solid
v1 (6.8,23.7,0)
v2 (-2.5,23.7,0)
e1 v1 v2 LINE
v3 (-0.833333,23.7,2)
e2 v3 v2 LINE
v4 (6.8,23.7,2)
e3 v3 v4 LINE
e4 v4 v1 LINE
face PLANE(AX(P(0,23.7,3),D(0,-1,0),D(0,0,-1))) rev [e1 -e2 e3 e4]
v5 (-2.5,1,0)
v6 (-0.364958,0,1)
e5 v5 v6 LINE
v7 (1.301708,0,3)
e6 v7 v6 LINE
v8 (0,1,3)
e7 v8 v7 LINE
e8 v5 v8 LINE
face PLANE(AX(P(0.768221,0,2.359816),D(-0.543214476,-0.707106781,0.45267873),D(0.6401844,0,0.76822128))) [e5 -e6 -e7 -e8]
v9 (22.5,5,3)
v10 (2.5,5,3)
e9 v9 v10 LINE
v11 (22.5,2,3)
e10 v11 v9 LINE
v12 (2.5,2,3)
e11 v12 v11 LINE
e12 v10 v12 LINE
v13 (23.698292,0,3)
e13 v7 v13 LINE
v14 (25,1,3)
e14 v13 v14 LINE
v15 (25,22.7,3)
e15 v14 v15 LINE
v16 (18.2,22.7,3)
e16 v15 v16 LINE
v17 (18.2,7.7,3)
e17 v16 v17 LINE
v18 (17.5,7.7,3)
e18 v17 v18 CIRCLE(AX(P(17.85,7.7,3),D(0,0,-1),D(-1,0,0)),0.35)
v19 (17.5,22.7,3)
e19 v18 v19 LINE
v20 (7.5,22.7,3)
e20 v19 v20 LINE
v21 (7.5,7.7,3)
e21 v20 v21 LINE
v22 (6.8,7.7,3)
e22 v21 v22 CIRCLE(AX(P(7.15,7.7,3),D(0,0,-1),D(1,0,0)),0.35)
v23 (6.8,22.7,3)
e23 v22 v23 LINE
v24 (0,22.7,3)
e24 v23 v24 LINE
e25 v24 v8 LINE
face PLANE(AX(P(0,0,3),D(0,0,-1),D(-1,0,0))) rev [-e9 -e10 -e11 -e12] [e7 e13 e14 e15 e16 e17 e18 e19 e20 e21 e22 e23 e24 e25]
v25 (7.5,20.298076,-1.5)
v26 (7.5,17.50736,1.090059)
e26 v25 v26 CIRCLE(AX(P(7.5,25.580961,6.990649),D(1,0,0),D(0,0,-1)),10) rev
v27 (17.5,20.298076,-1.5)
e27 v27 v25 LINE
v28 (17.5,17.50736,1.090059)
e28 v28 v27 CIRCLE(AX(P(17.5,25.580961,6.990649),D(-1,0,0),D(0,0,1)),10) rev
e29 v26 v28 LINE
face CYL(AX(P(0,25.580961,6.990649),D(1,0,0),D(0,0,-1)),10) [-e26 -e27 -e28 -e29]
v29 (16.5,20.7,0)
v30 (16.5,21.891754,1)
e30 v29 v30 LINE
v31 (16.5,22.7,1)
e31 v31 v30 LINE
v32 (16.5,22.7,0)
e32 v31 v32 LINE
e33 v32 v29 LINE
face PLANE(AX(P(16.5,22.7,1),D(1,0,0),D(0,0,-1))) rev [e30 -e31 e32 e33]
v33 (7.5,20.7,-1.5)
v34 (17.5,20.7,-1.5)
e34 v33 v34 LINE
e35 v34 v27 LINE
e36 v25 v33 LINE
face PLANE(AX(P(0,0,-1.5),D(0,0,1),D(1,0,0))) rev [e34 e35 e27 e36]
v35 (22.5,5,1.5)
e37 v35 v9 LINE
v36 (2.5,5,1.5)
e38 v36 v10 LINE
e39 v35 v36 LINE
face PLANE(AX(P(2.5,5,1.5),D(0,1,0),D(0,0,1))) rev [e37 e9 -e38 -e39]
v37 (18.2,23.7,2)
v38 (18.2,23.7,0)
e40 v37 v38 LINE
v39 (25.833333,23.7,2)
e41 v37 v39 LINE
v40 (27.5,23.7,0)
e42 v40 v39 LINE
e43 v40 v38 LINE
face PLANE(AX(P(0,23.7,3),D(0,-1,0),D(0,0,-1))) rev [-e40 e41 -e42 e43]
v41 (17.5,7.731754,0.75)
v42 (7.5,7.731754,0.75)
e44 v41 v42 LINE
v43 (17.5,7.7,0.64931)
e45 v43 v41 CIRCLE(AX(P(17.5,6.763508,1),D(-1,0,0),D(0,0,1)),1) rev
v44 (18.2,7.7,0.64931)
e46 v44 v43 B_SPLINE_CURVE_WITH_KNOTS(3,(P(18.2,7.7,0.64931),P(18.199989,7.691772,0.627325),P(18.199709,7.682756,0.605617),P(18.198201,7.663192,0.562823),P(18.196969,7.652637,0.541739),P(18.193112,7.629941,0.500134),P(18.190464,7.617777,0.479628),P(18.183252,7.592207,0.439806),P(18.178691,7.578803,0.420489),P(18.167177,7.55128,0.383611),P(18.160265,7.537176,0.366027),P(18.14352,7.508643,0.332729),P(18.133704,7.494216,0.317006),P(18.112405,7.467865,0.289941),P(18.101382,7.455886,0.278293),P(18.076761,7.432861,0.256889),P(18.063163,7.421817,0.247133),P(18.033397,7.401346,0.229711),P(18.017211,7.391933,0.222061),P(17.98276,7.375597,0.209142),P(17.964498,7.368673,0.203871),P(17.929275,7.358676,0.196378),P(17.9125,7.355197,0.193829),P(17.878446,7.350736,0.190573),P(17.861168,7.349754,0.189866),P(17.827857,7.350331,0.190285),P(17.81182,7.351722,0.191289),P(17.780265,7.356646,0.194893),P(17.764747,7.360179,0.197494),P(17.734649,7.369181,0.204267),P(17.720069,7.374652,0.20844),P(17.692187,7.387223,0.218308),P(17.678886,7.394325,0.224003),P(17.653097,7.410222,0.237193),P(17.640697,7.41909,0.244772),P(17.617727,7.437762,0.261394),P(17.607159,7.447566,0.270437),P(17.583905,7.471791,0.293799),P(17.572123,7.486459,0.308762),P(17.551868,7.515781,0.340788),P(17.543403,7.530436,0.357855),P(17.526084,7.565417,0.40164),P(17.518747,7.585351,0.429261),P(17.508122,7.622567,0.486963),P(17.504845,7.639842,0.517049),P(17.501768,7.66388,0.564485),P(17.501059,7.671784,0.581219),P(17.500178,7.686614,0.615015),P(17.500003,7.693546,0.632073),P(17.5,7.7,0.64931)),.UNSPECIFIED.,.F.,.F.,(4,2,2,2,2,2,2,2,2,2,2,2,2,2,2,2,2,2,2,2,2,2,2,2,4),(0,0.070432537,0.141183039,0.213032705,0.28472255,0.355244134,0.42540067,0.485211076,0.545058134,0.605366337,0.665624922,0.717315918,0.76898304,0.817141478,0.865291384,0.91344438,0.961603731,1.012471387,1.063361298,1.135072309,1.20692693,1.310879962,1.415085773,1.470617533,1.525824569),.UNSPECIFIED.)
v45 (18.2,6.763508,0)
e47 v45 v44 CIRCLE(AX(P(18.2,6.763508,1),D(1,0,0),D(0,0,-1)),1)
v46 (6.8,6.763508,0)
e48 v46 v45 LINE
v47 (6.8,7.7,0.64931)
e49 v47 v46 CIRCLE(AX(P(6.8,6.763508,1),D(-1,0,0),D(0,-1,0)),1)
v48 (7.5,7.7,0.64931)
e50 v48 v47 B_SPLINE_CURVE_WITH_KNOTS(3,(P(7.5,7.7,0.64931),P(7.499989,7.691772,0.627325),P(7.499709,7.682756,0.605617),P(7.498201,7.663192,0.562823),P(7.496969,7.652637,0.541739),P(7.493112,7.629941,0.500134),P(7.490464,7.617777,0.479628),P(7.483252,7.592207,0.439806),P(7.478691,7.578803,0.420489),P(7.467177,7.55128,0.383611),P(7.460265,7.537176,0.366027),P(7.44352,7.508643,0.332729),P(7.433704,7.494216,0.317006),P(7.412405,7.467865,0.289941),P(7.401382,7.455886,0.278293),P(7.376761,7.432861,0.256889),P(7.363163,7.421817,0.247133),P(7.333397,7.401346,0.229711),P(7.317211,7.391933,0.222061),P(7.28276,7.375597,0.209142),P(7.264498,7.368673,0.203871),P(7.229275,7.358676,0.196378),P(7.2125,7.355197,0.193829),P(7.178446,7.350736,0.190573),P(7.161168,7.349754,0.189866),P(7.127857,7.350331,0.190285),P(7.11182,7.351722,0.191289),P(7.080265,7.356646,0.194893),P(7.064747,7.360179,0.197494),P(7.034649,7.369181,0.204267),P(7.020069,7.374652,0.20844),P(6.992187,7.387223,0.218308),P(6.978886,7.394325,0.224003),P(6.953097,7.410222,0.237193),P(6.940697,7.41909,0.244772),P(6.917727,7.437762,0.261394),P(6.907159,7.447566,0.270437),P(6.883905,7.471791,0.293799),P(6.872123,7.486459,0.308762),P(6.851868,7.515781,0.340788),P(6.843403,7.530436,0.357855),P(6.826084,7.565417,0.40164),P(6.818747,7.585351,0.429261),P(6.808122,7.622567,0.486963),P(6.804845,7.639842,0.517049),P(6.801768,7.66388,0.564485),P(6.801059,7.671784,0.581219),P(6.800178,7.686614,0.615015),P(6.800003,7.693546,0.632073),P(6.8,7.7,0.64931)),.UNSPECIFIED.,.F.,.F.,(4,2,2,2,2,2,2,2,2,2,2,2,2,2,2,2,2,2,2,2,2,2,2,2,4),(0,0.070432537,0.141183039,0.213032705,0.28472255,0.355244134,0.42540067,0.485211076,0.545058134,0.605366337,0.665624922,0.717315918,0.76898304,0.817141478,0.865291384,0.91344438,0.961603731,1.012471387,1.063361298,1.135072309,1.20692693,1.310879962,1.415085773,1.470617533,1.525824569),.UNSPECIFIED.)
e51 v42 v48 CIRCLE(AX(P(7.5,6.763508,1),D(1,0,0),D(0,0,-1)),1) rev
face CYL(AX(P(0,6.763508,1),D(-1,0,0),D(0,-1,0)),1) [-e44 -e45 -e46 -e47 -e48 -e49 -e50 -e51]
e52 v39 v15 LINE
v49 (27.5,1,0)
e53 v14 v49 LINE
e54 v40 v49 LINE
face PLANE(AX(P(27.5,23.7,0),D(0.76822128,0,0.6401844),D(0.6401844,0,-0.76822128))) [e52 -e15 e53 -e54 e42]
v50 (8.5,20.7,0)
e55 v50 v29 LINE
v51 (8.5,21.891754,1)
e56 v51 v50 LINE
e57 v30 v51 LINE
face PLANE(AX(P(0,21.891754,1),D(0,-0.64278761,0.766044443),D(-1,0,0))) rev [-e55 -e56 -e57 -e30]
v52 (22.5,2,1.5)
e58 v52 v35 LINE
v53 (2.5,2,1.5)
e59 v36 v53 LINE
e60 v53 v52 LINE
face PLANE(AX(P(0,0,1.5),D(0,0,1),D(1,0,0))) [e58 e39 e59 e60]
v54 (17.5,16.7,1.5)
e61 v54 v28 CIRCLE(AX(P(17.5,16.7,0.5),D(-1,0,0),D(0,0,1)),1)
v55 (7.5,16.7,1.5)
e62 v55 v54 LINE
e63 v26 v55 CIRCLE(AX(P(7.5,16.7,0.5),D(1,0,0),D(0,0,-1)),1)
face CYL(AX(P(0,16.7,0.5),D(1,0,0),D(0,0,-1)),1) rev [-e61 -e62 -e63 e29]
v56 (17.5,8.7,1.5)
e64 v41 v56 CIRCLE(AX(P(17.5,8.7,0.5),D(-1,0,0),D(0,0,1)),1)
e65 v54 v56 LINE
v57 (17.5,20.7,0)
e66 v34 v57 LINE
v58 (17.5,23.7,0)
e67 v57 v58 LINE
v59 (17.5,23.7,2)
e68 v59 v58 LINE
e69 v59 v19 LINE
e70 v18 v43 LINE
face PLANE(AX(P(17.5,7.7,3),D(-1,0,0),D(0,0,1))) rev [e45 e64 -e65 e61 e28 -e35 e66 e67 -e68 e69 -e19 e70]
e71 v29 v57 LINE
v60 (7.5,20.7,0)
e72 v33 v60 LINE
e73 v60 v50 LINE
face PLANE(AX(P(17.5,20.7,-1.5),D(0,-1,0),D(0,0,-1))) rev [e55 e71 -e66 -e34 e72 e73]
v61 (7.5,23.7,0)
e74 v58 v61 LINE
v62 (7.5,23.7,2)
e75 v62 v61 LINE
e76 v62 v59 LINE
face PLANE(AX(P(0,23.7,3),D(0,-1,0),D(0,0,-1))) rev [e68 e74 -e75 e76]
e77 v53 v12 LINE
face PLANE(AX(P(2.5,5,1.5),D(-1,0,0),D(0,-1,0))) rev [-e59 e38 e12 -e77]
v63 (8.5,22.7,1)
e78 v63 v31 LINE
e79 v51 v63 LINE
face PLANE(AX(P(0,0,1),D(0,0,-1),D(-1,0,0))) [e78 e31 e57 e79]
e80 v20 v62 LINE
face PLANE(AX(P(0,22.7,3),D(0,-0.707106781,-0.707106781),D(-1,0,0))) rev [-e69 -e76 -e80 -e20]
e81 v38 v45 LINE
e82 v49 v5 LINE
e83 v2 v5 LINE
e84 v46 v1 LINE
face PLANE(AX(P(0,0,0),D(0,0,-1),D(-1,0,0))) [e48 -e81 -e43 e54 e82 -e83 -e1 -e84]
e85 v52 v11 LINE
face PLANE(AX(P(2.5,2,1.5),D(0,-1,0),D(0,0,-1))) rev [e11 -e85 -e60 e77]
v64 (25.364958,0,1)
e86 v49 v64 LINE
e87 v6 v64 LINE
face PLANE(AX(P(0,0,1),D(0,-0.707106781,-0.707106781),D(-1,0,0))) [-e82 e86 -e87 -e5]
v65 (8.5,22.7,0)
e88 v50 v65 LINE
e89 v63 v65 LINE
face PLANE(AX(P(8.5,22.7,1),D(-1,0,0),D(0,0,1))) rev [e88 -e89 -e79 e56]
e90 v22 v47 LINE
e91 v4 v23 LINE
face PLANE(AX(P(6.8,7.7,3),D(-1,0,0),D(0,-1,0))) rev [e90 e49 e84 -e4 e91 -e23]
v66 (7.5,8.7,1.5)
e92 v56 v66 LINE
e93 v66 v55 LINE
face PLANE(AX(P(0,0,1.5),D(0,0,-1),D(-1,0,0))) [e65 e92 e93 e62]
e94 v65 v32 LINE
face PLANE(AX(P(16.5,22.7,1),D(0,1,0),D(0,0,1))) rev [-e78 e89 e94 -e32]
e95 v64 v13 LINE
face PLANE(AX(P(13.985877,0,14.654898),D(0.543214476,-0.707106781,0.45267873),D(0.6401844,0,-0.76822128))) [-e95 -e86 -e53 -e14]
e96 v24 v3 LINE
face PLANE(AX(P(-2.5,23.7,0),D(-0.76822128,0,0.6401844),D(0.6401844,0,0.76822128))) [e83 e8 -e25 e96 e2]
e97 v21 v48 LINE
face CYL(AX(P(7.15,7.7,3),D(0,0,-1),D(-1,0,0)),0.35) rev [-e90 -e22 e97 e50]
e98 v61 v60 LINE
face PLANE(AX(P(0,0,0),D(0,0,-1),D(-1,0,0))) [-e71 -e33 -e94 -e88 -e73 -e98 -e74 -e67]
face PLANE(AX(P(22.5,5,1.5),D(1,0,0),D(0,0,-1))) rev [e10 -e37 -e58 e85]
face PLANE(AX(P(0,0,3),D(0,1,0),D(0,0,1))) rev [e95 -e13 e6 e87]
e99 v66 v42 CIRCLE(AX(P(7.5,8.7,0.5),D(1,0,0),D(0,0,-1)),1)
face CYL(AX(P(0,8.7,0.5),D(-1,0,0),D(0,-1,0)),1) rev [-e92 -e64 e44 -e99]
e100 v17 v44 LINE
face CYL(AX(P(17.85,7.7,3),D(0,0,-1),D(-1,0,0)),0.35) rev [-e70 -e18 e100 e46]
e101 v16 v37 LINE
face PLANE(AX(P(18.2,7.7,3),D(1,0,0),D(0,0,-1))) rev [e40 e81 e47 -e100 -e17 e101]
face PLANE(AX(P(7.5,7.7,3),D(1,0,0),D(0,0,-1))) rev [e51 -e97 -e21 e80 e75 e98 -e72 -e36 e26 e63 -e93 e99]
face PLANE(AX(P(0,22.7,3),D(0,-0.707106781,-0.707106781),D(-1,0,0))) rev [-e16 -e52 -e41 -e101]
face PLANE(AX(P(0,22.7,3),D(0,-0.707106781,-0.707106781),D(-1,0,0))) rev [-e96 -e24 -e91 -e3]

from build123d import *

# Parameters (mm, degrees)
SKETCH1_W           = 25
SKETCH1_H           = 23.7
BOSS_EXTRUDE1_DEPTH = 3
BOSS_EXTRUDE2_DEPTH = 23.7
SKETCH4_W           = 10
SKETCH4_H           = 10
CUT_EXTRUDE1_DEPTH  = 1.5
CUT_EXTRUDE2_DEPTH  = 3
SKETCH6_W           = 10
SKETCH6_H           = 3
BOSS_EXTRUDE3_DEPTH = 1.5
CHAMFER1_SIZE       = 1.5
CHAMFER1_SIZE2      = 2.598076211
SKETCH7_W           = 20
SKETCH7_H           = 3
CUT_EXTRUDE3_DEPTH  = 1.5
FILLET1_R           = 1
SKETCH8_W           = 8
SKETCH8_H           = 2
CUT_EXTRUDE4_DEPTH  = 1
FILLET2_R           = 10
FILLET3_R           = 1
CHAMFER3_SIZE       = 1
CHAMFER4_SIZE       = 1
CHAMFER5_SIZE       = 1
CHAMFER5_SIZE2      = 1.191753593


with BuildPart() as part:
    # Sketch1 → Boss-Extrude1 (new body)
    with BuildSketch(Plane.XY):
        with Locations((12.5, 11.85)):
            Rectangle(SKETCH1_W, SKETCH1_H)
    extrude(amount=BOSS_EXTRUDE1_DEPTH)

    # Sketch2 → Boss-Extrude2 (add)
    with BuildSketch(Plane.XZ):
        Polygon((0, 0), (-2.5, 0), (0, 3), align=None)
        Polygon((25, 0), (27.5, 0), (25, 3), align=None)
    extrude(amount=-BOSS_EXTRUDE2_DEPTH)

    # Sketch4 → Cut-Extrude1 (cut)
    with BuildSketch(Plane(origin=(0, 0, 0), x_dir=(-1, 0, 0), z_dir=(0, 0, -1))):
        with Locations((-12.5, 12.7)):
            Rectangle(SKETCH4_W, SKETCH4_H)
    extrude(amount=-CUT_EXTRUDE1_DEPTH, mode=Mode.SUBTRACT)

    # Sketch5 → Cut-Extrude2 (cut)
    with BuildSketch(Plane(origin=(0, 0, 0), x_dir=(-1, 0, 0), z_dir=(0, 0, -1))):
        with BuildLine():
            Line((-17.5, 7.7), (-17.5, 23.7))
            Line((-17.5, 23.7), (-18.2, 23.7))
            Line((-18.2, 23.7), (-18.2, 7.7))
            ThreePointArc((-18.2, 7.7), (-17.85, 7.35), (-17.5, 7.7))
        make_face()
        with BuildLine():
            Line((-7.5, 7.7), (-7.5, 23.7))
            Line((-7.5, 23.7), (-6.8, 23.7))
            Line((-6.8, 23.7), (-6.8, 7.7))
            ThreePointArc((-6.8, 7.7), (-7.15, 7.35), (-7.5, 7.7))
        make_face()
    extrude(amount=-CUT_EXTRUDE2_DEPTH, mode=Mode.SUBTRACT)

    # Sketch6 → Boss-Extrude3 (add)
    with BuildSketch(Plane(origin=(0, 0, 0), x_dir=(-1, 0, 0), z_dir=(0, 0, -1))):
        with Locations((-12.5, 19.2)):
            Rectangle(SKETCH6_W, SKETCH6_H)
    extrude(amount=BOSS_EXTRUDE3_DEPTH)

    # Chamfer1
    chamfer1_edges = [part.edges().sort_by_distance(p)[0] for p in [
        (12.5, 17.7, -1.5),
    ]]
    chamfer1_side = [part.faces().sort_by_distance(p)[0] for p in [
        (12.5, 17.7, 0),
    ]]
    chamfer(chamfer1_edges, length=CHAMFER1_SIZE, length2=CHAMFER1_SIZE2, reference=chamfer1_side[0])

    # Sketch7 → Cut-Extrude3 (cut)
    with BuildSketch(Plane.XY.offset(3)):
        with Locations((12.5, 3.5)):
            Rectangle(SKETCH7_W, SKETCH7_H)
    extrude(amount=-CUT_EXTRUDE3_DEPTH, mode=Mode.SUBTRACT)

    # Fillet1
    fillet1_edges = [part.edges().sort_by_distance(p)[0] for p in [
        (12.5, 17.7, 1.5),
        (12.5, 7.7, 1.5),
    ]]
    fillet(fillet1_edges, radius=FILLET1_R)

    # Sketch8 → Cut-Extrude4 (cut)
    with BuildSketch(Plane(origin=(0, 0, 0), x_dir=(-1, 0, 0), z_dir=(0, 0, -1))):
        with Locations((-12.5, 21.7)):
            Rectangle(SKETCH8_W, SKETCH8_H)
    extrude(amount=-CUT_EXTRUDE4_DEPTH, mode=Mode.SUBTRACT)

    # Fillet2
    # the kernel refuses this fillet: 10 mm, written as the material it takes off along each edge
    with BuildSketch(Plane(origin=(25, 17.7, 0), x_dir=(0, -0.17402760364384265, 0.9847407746051655), z_dir=(-1, 0, 0))) as fillet2_piece_1_section:
        with BuildLine():
            CenterArc((5.512472708, 8.977269728), FILLET2_R, 221.911963519, 21.948914507)
            Line((-1.929248139, 2.297390175), (-2.673420224, 1.62940222))
            ThreePointArc((-2.673420224, 1.62940222), (-1.730420795, 0.505612375), (-0.765796725, -0.643082713))
            Line((-0.765796725, -0.643082713), (0.174027604, -0.984740775))
            Line((0.174027604, -0.984740775), (0.666397991, -0.897726973))
            Line((0.666397991, -0.897726973), (1.106950238, 0))
        make_face()
    fillet2_piece_1 = extrude(amount=25, mode=Mode.PRIVATE)
    fillet2_piece_1 = split(fillet2_piece_1, bisect_by=Plane(origin=(18.2, 17.7, 0), z_dir=(-1, 0, 0)), keep=Keep.TOP, mode=Mode.PRIVATE)
    fillet2_piece_1 = split(fillet2_piece_1, bisect_by=Plane(origin=(6.8, 17.7, 0), z_dir=(1, 0, 0)), keep=Keep.TOP, mode=Mode.PRIVATE)
    add(fillet2_piece_1, mode=Mode.SUBTRACT)

    # Fillet3
    # the kernel refuses this fillet: 1 mm, written as the material it takes off along each edge
    with BuildSketch(Plane(origin=(5.158770817, 7.7, 0), x_dir=(0, -1, 0), z_dir=(1, 0, 0))) as fillet3_piece_1_section:
        with BuildLine():
            CenterArc((0.936491673, -1), FILLET3_R, 90, 75.522487814)
            Line((-0.031754163, -0.75), (-0.128578747, -0.725))
            ThreePointArc((-0.128578747, -0.725), (-0.1, -0.5), (-0.1, 0))
            Line((-0.1, 0), (0, 0.1))
            Line((0, 0.1), (0.936491673, 0.1))
            Line((0.936491673, 0.1), (0.936491673, 0))
        make_face()
    fillet3_piece_1 = extrude(amount=14.682458366, mode=Mode.PRIVATE)
    fillet3_piece_1 = split(fillet3_piece_1, bisect_by=Plane(origin=(6.8, 7.7, 0), z_dir=(1, 0, 0)), keep=Keep.TOP, mode=Mode.PRIVATE)
    fillet3_piece_1 = split(fillet3_piece_1, bisect_by=Plane(origin=(18.2, 7.7, 0), z_dir=(-1, 0, 0)), keep=Keep.TOP, mode=Mode.PRIVATE)
    add(fillet3_piece_1, mode=Mode.SUBTRACT)

    # Chamfer3
    chamfer3_edges = [part.edges().sort_by_distance(p)[0] for p in [
        (-1.25, 0, 1.5),
        (26.25, 0, 1.5),
        (12.5, 0, 0),
    ]]
    chamfer(chamfer3_edges, length=CHAMFER3_SIZE)

    # Chamfer4
    chamfer4_edges = [part.edges().sort_by_distance(p)[0] for p in [
        (21.6, 23.7, 3),
        (12.5, 23.7, 3),
        (3.4, 23.7, 3),
    ]]
    chamfer(chamfer4_edges, length=CHAMFER4_SIZE)

    # Chamfer5
    chamfer5_edges = [part.edges().sort_by_distance(p)[0] for p in [
        (12.5, 20.7, 1),
    ]]
    chamfer5_side = [part.faces().sort_by_distance(p)[0] for p in [
        (12.5, 20.7, -0.315217391),
    ]]
    chamfer(chamfer5_edges, length=CHAMFER5_SIZE, length2=CHAMFER5_SIZE2, reference=chamfer5_side[0])


solid = part.part
